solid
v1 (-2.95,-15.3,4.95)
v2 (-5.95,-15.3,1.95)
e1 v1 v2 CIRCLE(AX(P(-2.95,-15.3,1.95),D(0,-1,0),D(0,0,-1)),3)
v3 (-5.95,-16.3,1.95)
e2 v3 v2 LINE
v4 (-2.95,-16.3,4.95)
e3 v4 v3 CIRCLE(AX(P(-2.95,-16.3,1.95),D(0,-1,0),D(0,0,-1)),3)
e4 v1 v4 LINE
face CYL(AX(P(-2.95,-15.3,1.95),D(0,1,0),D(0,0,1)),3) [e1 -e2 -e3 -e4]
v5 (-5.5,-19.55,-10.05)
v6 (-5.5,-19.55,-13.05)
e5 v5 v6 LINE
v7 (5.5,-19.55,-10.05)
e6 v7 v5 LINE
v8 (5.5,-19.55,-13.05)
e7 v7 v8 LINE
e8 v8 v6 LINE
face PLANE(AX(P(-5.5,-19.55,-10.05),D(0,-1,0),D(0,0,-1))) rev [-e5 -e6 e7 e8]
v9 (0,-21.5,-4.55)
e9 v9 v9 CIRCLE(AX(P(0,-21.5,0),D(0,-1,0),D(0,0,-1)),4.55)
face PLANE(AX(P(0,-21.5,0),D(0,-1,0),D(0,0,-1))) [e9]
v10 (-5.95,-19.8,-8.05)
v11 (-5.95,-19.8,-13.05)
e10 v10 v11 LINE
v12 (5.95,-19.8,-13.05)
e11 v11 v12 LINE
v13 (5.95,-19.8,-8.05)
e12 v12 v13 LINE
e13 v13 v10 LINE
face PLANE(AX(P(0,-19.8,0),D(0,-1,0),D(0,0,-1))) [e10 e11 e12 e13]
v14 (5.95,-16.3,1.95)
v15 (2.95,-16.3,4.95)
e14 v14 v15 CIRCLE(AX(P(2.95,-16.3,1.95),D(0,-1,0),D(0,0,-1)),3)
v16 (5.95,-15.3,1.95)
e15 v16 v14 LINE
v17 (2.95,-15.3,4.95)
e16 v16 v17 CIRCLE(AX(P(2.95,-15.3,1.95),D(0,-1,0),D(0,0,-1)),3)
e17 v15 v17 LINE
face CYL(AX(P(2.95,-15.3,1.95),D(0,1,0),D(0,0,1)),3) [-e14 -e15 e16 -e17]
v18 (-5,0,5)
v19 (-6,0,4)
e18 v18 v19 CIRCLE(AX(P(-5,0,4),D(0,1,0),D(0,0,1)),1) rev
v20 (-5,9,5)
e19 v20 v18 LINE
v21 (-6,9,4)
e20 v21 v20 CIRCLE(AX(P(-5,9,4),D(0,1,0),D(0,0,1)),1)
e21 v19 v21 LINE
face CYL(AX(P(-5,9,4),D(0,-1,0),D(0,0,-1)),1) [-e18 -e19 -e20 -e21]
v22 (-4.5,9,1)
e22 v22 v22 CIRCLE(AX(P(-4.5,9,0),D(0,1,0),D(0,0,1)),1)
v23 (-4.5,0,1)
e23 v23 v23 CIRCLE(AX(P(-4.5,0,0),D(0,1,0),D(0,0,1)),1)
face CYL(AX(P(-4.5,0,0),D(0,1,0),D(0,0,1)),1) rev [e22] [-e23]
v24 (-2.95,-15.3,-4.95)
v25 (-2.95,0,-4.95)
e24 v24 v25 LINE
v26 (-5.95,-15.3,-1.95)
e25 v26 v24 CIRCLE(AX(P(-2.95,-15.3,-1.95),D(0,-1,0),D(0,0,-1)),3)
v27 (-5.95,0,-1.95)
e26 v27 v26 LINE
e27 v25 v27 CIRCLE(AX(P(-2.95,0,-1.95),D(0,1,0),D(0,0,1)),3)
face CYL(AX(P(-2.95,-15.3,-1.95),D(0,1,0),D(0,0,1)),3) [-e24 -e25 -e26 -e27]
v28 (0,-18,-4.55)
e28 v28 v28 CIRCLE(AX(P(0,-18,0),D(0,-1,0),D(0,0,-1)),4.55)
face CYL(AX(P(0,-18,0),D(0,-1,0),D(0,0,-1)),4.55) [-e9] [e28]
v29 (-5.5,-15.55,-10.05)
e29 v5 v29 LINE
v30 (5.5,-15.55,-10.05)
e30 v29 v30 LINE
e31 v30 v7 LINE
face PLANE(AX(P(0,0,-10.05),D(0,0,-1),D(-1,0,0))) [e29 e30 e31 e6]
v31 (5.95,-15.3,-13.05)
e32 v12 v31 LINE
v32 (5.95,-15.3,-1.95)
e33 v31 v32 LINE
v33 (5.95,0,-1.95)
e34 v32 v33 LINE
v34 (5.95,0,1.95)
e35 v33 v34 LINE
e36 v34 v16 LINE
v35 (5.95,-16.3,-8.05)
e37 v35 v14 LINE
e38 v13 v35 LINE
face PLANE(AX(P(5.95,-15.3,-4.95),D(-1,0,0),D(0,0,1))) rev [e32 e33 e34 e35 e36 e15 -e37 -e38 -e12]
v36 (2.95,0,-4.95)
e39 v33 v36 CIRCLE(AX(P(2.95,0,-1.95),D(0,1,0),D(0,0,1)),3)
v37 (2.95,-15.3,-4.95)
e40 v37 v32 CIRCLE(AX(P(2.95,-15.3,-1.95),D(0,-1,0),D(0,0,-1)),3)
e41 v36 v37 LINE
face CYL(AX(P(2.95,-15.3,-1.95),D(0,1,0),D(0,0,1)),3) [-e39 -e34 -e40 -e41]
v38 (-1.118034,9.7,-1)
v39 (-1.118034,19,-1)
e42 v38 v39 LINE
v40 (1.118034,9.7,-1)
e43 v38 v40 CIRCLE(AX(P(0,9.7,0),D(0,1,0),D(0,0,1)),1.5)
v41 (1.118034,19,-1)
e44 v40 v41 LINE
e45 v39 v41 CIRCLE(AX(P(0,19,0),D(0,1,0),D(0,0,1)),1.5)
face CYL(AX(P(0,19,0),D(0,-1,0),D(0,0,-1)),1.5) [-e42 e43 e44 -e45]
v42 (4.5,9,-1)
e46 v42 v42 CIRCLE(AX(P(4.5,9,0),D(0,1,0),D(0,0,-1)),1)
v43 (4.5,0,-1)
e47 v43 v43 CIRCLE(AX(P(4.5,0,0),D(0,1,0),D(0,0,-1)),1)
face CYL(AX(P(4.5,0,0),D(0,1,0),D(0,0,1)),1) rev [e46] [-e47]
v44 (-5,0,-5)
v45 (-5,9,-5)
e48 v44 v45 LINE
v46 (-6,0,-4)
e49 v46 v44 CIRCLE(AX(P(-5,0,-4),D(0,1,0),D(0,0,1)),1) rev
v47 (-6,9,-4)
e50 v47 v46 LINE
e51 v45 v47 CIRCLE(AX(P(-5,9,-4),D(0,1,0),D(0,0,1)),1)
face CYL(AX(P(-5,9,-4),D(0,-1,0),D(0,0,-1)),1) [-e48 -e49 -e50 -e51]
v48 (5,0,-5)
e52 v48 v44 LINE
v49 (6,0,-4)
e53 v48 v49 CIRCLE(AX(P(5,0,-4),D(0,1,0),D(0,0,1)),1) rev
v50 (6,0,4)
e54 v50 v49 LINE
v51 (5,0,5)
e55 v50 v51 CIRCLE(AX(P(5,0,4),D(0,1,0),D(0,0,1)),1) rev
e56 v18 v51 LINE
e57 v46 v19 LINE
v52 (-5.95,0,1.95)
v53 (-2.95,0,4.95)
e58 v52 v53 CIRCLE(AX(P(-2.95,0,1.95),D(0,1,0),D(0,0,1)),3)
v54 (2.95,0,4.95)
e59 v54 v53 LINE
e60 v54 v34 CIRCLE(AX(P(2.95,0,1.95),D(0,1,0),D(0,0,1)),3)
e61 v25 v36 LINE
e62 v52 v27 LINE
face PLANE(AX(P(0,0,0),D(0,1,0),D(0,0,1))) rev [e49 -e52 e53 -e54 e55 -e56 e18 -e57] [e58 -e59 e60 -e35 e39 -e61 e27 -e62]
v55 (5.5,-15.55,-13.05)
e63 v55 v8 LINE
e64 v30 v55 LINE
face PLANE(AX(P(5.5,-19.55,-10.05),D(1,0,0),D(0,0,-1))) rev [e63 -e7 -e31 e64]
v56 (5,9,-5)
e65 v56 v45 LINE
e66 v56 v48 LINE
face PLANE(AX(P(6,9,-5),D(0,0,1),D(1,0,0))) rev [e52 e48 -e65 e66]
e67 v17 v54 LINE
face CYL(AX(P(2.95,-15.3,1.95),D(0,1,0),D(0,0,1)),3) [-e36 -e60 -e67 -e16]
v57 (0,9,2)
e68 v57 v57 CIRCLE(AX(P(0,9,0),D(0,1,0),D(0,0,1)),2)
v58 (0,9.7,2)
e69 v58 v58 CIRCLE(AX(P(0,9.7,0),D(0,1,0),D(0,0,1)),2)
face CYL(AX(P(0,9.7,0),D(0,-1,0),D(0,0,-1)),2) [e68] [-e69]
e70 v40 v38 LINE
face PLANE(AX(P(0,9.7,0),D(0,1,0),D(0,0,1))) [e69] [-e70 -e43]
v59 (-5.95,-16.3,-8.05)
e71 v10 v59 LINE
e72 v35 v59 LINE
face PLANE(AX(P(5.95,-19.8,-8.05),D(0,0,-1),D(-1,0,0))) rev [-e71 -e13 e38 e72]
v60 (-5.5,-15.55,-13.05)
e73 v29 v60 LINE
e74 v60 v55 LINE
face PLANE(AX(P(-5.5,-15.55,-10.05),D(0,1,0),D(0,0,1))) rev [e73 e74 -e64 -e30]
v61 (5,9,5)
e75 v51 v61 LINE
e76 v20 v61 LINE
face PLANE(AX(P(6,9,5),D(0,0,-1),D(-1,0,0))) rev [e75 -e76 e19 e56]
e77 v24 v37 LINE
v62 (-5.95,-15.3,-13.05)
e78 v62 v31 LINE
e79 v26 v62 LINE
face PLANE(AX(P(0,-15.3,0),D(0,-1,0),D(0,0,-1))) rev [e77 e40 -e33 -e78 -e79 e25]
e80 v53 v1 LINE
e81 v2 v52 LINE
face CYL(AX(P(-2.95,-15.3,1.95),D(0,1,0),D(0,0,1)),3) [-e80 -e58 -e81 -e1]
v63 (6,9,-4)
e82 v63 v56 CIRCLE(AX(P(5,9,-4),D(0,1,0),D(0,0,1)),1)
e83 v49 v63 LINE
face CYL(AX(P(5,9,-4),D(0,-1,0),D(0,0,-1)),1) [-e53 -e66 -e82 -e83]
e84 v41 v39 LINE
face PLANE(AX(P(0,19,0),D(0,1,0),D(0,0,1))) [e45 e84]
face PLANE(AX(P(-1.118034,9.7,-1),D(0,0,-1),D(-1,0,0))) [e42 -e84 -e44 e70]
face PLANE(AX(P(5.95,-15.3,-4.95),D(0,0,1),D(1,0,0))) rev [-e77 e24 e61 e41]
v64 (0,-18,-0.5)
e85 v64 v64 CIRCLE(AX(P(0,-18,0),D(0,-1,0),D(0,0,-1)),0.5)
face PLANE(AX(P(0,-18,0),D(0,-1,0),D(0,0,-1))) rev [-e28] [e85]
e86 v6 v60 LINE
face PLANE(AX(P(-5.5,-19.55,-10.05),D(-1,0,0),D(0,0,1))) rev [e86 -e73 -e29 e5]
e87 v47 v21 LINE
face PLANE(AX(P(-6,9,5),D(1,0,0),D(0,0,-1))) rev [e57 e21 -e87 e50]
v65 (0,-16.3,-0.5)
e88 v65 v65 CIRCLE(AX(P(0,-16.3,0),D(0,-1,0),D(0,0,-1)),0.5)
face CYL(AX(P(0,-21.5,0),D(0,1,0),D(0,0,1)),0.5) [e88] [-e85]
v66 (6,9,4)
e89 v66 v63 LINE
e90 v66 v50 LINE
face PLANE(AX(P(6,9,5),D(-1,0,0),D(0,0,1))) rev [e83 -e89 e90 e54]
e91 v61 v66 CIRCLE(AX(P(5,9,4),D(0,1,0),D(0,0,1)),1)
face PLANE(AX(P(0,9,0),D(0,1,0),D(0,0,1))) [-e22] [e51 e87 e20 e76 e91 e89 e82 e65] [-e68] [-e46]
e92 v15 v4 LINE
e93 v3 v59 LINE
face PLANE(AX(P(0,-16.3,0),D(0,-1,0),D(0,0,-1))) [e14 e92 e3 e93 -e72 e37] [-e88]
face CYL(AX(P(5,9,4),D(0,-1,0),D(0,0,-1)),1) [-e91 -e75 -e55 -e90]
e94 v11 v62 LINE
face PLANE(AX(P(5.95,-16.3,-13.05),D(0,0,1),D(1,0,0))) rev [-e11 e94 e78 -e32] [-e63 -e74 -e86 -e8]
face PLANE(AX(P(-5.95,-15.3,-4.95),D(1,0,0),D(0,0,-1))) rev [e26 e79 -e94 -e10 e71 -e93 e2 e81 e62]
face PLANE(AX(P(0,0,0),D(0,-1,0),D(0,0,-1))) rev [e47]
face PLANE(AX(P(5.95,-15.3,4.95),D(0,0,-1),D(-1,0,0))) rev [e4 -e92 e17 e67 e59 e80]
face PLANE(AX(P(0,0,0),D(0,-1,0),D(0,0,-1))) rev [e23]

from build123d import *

# Parameters (mm, degrees)
SKETCH_1_W          = 12
SKETCH_1_H          = 10
EXTRUDE_1_DEPTH     = 9
SKETCH_2_R          = 1
CUT_EXTRUDE_1_DEPTH = 12.916375288
SKETCH_3_R          = 2
EXTRUDE_2_DEPTH     = 0.7
SKETCH_4_R          = 1.5
EXTRUDE_3_DEPTH     = 9.3
SKETCH_5_OUTSIDE_W  = 18.92
SKETCH_5_OUTSIDE_H  = 16.92
CUT_EXTRUDE_2_DEPTH = 9.3
FILLET_1_R          = 1
SKETCH_6_W          = 11.9
SKETCH_6_H          = 9.9
EXTRUDE_4_DEPTH     = 15.3
FILLET_3_R          = 3
SKETCH_7_W          = 11.9
SKETCH_7_H          = 18
EXTRUDE_5_DEPTH     = 1
FILLET_4_R          = 3
SKETCH_8_R          = 0.5
EXTRUDE_6_DEPTH     = 5.2
SKETCH_9_R          = 4.55
EXTRUDE_7_DEPTH     = 3.5
SKETCH_10_W         = 11.9
SKETCH_10_H         = 5
EXTRUDE_8_DEPTH     = 3.5
SKETCH_11_W         = 11
SKETCH_11_H         = 4
CUT_EXTRUDE_3_DEPTH = 3


with BuildPart() as part:
    # 草图1 → 凸台-拉伸1 (new body)
    with BuildSketch(Plane(origin=(0, 0, 0), x_dir=(1, 0, 0), z_dir=(0, 1, 0))):
        Rectangle(SKETCH_1_W, SKETCH_1_H)
    extrude(amount=EXTRUDE_1_DEPTH)

    # 草图2 → 切除-拉伸1 (cut, through all)
    with BuildSketch(Plane(origin=(0, 9, 0), x_dir=(1, 0, 0), z_dir=(0, 1, 0))):
        with Locations(Location((-4.5, 0, 0), (0, 0, 270))):
            Circle(SKETCH_2_R)
        with Locations(Location((4.5, 0, 0), (0, 0, 90))):
            Circle(SKETCH_2_R)
    extrude(amount=-CUT_EXTRUDE_1_DEPTH, mode=Mode.SUBTRACT)

    # 草图3 → 凸台-拉伸2 (add)
    with BuildSketch(Plane(origin=(0, 9, 0), x_dir=(1, 0, 0), z_dir=(0, 1, 0))):
        with Locations(Location((0, 0, 0), (0, 0, 270))):
            Circle(SKETCH_3_R)
    extrude(amount=EXTRUDE_2_DEPTH)

    # 草图4 → 凸台-拉伸3 (add)
    with BuildSketch(Plane(origin=(0, 9.7, 0), x_dir=(1, 0, 0), z_dir=(0, 1, 0))):
        with Locations(Location((0, 0, 0), (0, 0, 270))):
            Circle(SKETCH_4_R)
    extrude(amount=EXTRUDE_3_DEPTH)

    # 草图5 outside → 切除-拉伸2 (cut)
    with BuildSketch(Plane(origin=(0, 19, 0), x_dir=(1, 0, 0), z_dir=(0, 1, 0))):
        Rectangle(SKETCH_5_OUTSIDE_W, SKETCH_5_OUTSIDE_H)
        with BuildLine():
            Line((-1.118033989, 1), (1.118033989, 1))
            ThreePointArc((1.118033989, 1), (0, -1.5), (-1.118033989, 1))
        make_face(mode=Mode.SUBTRACT)
    extrude(amount=-CUT_EXTRUDE_2_DEPTH, mode=Mode.SUBTRACT)

    # 圆角1
    fillet_1_edges = [part.edges().sort_by_distance(p)[0] for p in [
        (-6, 4.5, -5),
        (6, 4.5, -5),
        (6, 4.5, 5),
        (-6, 4.5, 5),
    ]]
    fillet(fillet_1_edges, radius=FILLET_1_R)

    # 草图6 → 凸台-拉伸4 (add)
    with BuildSketch(Plane.XZ):
        Rectangle(SKETCH_6_W, SKETCH_6_H)
    extrude(amount=EXTRUDE_4_DEPTH)

    # 圆角3
    # the kernel refuses this fillet: 3 mm, written as the material it takes off along each edge
    with BuildSketch(Plane(origin=(-5.95, 0, 4.95), x_dir=(1, 0, 0), z_dir=(0, -1, 0)), Plane(origin=(-5.95, 0, -4.95), x_dir=(0, 0, 1), z_dir=(0, -1, 0))) as fillet_3_piece_1:
        with BuildLine():
            CenterArc((FILLET_3_R, -FILLET_3_R), FILLET_3_R, 90, 90)
            Line((0, -FILLET_3_R), (0, 0))
            Line((0, 0), (FILLET_3_R, 0))
        make_face()
    extrude(amount=22.8, mode=Mode.SUBTRACT)
    with BuildSketch(Plane(origin=(5.95, 0, -4.95), x_dir=(0, 0, 1), z_dir=(0, -1, 0)), Plane(origin=(5.95, 0, 4.95), x_dir=(-1, 0, 0), z_dir=(0, -1, 0))) as fillet_3_piece_2:
        with BuildLine():
            CenterArc((FILLET_3_R, FILLET_3_R), FILLET_3_R, 180, 90)
            Line((0, FILLET_3_R), (0, 0))
            Line((0, 0), (FILLET_3_R, 0))
        make_face()
    extrude(amount=22.8, mode=Mode.SUBTRACT)

    # 草图7 → 凸台-拉伸5 (add)
    with BuildSketch(Plane.XZ.offset(15.3)):
        with Locations((0, -4.05)):
            Rectangle(SKETCH_7_W, SKETCH_7_H)
    extrude(amount=EXTRUDE_5_DEPTH)

    # 圆角4
    fillet_4_edges = [part.edges().sort_by_distance(p)[0] for p in [
        (5.95, -15.8, 4.95),
        (-5.95, -15.8, 4.95),
    ]]
    fillet(fillet_4_edges, radius=FILLET_4_R)

    # 草图8 → 凸台-拉伸6 (add)
    with BuildSketch(Plane.XZ.offset(16.3)):
        with Locations(Location((0, 0, 0), (0, 0, 270))):
            Circle(SKETCH_8_R)
    extrude(amount=EXTRUDE_6_DEPTH)

    # 草图9 → 凸台-拉伸7 (add)
    with BuildSketch(Plane.XZ.offset(21.5)):
        with Locations(Location((0, 0, 0), (0, 0, 270))):
            Circle(SKETCH_9_R)
    extrude(amount=-EXTRUDE_7_DEPTH)

    # 草图10 → 凸台-拉伸8 (add)
    with BuildSketch(Plane.XZ.offset(16.3)):
        with Locations((0, -10.55)):
            Rectangle(SKETCH_10_W, SKETCH_10_H)
    extrude(amount=EXTRUDE_8_DEPTH)

    # 草图11 → 切除-拉伸3 (cut)
    with BuildSketch(Plane(origin=(0, 0, -13.05), x_dir=(-1, 0, 0), z_dir=(0, 0, -1))):
        with Locations((0, -17.55)):
            Rectangle(SKETCH_11_W, SKETCH_11_H)
    extrude(amount=-CUT_EXTRUDE_3_DEPTH, mode=Mode.SUBTRACT)


solid = part.part
